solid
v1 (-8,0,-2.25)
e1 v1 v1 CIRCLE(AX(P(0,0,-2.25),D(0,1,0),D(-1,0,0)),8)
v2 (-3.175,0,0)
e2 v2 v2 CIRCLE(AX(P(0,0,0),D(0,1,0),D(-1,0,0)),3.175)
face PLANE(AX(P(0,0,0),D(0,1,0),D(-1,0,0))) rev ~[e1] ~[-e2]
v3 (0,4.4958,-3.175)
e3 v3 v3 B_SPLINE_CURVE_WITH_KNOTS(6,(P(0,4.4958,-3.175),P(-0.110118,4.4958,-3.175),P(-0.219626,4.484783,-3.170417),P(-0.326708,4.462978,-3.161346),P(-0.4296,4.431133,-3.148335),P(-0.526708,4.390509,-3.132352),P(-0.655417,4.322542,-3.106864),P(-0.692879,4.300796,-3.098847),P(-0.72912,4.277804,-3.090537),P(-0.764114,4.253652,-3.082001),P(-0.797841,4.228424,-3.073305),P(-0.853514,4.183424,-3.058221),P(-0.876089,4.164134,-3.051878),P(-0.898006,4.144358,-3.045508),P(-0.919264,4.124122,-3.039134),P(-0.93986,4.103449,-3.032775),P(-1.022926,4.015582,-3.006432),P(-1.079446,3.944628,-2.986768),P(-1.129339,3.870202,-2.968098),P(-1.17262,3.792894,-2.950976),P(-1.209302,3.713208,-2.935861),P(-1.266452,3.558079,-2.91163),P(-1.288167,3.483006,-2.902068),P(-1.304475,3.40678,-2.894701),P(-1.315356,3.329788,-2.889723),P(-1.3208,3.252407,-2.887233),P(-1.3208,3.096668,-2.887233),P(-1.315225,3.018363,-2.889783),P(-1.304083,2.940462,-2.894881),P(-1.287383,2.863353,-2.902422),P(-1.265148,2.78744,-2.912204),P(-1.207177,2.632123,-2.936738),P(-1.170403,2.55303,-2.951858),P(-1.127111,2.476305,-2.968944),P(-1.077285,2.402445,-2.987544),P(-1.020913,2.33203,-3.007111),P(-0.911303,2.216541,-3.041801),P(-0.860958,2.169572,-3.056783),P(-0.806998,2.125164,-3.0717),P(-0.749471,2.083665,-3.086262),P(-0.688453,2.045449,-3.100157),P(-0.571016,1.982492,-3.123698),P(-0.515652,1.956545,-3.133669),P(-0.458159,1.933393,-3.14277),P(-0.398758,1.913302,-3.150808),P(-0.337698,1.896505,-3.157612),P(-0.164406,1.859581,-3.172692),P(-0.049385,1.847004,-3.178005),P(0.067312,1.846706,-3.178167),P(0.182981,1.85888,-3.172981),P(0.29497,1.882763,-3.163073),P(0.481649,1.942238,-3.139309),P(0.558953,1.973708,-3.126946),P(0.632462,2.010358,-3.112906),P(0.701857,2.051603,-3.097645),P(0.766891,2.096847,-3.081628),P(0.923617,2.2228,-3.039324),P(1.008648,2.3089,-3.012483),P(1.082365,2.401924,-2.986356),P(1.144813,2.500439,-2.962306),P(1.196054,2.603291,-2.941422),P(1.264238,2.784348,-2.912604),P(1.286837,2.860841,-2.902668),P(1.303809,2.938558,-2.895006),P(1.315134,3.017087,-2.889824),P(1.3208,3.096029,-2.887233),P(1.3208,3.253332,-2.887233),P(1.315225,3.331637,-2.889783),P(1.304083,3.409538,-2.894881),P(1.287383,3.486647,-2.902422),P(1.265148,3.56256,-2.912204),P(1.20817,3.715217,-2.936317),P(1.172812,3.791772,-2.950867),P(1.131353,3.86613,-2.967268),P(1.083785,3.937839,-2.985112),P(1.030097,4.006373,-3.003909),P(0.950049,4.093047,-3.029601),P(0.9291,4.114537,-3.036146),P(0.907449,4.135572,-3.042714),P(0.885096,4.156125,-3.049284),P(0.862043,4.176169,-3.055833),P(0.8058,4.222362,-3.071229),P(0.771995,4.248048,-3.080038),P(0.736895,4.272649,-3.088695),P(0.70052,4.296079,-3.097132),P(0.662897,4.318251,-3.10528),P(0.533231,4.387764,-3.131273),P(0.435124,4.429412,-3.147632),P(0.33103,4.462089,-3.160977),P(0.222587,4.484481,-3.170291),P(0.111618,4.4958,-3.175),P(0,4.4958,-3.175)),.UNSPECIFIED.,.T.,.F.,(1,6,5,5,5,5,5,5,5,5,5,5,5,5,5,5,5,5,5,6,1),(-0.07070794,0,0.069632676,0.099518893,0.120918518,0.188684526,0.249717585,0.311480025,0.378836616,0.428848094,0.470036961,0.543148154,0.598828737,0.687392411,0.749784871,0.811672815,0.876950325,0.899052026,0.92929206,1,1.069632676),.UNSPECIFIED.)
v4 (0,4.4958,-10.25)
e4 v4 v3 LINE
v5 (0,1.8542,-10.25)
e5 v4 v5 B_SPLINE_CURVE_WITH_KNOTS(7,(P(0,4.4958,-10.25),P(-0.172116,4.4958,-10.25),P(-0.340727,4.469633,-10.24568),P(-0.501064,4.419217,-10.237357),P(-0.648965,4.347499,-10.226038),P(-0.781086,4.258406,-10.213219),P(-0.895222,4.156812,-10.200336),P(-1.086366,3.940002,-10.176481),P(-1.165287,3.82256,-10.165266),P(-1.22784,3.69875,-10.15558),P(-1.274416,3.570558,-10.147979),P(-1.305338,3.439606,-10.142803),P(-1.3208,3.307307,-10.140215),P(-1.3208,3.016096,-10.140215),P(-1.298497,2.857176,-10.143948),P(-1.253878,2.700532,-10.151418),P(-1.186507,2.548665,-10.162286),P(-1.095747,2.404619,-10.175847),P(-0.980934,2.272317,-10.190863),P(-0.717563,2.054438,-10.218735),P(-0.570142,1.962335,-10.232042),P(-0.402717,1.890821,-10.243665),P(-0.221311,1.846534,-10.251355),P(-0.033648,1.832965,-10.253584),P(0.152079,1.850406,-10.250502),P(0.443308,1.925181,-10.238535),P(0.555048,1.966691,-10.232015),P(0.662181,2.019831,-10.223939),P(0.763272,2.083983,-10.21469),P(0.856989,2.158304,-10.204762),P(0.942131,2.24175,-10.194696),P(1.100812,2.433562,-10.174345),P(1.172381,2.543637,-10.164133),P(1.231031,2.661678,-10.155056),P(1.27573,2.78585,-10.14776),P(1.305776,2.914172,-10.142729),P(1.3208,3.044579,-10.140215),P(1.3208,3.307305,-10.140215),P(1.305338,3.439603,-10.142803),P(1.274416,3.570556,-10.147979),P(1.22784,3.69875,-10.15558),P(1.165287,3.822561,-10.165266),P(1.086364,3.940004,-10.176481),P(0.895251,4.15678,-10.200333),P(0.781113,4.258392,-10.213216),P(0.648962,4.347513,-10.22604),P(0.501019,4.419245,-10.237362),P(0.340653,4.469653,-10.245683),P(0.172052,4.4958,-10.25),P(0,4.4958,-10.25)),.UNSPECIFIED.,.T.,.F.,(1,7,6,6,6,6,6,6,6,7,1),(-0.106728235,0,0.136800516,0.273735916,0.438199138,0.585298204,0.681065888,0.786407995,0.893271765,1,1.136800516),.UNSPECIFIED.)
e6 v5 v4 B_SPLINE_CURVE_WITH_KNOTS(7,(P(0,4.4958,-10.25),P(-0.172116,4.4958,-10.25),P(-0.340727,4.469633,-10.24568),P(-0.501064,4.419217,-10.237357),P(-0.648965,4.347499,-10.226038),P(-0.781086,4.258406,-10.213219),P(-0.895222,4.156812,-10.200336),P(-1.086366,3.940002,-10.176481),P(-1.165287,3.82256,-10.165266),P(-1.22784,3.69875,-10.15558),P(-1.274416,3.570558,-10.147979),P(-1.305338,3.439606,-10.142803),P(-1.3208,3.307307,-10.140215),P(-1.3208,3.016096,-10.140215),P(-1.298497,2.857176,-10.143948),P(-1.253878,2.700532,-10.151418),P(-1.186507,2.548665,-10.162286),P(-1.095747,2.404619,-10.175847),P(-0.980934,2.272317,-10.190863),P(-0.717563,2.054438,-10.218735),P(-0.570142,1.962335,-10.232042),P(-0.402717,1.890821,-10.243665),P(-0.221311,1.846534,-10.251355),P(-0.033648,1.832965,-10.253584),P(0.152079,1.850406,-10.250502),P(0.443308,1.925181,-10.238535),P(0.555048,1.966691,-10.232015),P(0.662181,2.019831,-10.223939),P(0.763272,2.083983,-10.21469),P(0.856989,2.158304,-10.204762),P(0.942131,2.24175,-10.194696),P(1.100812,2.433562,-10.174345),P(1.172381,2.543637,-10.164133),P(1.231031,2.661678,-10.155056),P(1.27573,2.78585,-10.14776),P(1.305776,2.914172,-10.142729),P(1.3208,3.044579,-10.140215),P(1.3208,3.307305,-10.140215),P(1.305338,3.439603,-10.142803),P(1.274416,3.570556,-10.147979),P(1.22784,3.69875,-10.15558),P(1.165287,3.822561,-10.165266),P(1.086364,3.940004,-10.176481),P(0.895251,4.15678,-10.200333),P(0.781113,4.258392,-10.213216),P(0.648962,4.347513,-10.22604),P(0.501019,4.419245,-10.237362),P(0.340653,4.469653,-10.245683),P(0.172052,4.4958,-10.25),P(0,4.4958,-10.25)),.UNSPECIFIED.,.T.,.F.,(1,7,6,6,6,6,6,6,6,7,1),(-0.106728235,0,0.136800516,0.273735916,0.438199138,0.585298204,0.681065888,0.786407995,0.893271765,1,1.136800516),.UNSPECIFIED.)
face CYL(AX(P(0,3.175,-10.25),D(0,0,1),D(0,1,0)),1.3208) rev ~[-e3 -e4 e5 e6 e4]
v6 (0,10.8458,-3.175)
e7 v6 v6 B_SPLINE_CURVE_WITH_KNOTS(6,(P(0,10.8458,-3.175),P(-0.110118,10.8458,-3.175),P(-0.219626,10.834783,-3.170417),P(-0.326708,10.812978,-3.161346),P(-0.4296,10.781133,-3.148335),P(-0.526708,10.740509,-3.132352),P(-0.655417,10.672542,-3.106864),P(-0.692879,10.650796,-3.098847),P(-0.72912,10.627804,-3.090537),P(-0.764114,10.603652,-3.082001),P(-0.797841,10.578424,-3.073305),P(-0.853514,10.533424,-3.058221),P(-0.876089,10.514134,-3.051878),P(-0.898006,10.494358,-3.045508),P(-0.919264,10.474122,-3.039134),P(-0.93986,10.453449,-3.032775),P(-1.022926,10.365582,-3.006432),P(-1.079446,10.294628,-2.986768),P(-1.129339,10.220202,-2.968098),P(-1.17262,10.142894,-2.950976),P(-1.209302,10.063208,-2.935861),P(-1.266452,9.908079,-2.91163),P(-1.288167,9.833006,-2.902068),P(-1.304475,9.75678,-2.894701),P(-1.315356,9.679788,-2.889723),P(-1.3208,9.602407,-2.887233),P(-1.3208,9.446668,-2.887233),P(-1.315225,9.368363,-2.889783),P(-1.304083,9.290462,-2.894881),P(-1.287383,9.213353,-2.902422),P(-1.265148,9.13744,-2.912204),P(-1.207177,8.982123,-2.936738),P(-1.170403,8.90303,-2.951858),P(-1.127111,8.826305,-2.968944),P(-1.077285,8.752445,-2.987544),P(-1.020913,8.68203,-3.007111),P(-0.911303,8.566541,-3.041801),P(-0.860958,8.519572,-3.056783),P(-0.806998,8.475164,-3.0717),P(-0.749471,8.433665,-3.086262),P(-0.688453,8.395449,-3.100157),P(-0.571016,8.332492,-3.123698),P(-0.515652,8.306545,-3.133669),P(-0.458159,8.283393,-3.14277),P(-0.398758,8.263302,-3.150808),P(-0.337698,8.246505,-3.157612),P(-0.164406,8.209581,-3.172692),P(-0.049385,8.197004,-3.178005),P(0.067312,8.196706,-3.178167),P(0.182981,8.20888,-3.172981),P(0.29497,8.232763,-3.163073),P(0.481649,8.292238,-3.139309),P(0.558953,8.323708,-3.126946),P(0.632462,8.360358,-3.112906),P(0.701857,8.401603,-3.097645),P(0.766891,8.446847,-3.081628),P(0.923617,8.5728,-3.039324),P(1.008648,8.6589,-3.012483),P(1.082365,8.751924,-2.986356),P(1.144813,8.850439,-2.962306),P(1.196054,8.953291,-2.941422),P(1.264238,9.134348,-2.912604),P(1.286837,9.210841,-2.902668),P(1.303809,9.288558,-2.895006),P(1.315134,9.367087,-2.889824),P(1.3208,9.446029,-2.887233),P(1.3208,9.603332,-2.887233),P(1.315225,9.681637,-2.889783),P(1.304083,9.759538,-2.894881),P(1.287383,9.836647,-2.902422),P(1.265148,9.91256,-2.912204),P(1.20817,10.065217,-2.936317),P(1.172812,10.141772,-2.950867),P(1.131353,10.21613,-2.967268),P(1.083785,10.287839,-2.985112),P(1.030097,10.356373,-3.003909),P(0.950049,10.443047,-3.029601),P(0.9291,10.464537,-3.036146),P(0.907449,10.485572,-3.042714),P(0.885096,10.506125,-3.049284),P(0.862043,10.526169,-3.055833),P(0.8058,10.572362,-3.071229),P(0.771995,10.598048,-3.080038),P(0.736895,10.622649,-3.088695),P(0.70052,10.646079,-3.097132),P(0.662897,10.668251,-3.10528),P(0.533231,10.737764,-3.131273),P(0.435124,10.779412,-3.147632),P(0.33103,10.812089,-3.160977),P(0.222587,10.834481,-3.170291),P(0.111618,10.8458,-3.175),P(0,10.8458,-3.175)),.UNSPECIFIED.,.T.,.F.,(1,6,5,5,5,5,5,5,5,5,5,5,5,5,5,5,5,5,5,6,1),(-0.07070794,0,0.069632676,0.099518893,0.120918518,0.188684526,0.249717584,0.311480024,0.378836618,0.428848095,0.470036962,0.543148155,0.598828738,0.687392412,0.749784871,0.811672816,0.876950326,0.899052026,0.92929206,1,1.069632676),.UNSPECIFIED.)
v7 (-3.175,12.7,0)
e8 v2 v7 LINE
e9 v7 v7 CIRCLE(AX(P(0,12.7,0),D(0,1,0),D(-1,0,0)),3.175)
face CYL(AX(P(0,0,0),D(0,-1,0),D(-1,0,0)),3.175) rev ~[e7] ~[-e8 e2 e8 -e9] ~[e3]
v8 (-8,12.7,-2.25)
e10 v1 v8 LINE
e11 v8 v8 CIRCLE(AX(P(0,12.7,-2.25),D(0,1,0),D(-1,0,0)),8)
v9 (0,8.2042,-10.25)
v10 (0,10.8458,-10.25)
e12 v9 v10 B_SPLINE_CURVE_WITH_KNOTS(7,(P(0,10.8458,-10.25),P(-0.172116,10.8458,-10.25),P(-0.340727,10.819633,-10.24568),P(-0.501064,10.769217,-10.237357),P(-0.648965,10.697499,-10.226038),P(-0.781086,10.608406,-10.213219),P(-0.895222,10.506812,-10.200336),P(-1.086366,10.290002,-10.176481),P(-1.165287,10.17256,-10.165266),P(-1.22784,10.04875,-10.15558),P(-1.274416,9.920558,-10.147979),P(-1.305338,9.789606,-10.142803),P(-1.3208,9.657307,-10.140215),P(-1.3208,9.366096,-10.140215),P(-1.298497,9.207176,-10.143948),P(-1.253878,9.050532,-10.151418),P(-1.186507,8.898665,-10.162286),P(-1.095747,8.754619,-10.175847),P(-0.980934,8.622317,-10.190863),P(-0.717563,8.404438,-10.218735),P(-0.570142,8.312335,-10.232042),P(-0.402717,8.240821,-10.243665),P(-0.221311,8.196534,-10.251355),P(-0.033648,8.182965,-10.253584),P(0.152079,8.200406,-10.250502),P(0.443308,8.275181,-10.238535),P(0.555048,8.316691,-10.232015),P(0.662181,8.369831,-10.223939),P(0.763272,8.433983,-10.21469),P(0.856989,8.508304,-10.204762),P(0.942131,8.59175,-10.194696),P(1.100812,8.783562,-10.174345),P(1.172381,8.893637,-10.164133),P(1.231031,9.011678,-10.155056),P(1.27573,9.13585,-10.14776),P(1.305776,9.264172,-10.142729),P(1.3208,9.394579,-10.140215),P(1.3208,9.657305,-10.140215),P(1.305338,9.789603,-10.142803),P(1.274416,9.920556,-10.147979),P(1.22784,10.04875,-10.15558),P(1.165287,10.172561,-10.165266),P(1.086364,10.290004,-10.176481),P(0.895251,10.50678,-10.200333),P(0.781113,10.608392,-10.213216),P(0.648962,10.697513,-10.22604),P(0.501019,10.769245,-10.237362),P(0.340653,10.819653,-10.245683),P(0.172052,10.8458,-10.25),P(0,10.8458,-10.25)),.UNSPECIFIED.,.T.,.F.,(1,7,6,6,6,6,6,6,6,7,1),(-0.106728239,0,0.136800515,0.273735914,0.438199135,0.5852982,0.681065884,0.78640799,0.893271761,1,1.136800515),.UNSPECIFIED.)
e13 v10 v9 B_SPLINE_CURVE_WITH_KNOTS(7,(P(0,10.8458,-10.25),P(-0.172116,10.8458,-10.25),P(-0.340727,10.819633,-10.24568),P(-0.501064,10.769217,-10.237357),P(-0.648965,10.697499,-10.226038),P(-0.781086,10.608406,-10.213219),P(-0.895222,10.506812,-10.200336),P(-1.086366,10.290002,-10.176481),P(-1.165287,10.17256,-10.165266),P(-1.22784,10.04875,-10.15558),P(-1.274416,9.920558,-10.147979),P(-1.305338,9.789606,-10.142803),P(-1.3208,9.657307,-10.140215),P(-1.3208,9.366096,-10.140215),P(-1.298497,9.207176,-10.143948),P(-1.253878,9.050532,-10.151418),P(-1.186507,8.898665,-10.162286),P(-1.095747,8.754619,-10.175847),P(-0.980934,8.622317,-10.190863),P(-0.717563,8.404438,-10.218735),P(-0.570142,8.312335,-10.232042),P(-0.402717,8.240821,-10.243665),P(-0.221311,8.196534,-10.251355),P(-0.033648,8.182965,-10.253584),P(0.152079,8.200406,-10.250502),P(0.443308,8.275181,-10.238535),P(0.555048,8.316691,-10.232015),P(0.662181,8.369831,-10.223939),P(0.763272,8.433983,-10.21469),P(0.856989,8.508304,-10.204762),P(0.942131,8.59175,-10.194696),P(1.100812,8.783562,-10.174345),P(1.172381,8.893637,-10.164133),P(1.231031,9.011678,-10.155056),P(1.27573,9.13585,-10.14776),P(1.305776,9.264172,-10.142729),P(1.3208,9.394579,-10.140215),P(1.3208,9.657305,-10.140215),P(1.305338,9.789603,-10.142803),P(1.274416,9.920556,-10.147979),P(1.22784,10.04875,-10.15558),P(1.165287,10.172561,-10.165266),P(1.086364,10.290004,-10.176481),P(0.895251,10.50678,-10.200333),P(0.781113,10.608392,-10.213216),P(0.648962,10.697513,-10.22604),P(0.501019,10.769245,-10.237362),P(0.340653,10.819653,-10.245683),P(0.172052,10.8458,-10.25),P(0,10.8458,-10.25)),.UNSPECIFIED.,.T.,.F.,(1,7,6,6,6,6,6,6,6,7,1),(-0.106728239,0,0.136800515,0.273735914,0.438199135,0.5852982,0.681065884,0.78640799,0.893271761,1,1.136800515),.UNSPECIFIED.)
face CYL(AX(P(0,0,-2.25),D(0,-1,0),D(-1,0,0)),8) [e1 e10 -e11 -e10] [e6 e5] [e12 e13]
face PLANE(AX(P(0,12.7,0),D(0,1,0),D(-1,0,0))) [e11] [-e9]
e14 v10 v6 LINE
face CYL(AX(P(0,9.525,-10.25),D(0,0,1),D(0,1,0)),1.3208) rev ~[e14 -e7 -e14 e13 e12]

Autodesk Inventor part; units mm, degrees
ref_plane "YZ Plane" through (0, 0, 0) normal (1, 0, 0) x (0, 1, 0)
ref_plane "XZ Plane" through (0, 0, 0) normal (0, 1, 0) x (-1, 0, 0)
sketch "Sketch1" plane through (0, 0, 0) normal (0, 1, 0) x (-1, 0, 0)
  circle A0 centre (0, 0) radius 3.175
  circle A1 centre (0, -2.25) radius 8
  line L0 (0, -2.25) -> (0, 0) construction
  circle A2 centre (0, 0) radius 4.7625 construction
  dimension "d5" = 6.35
  dimension "d6" = 2.25
  dimension "d9" = 9.525
  dimension "d11" = 16
extrude "Extrusion1" add sketch "Sketch1" along normal blind 12.7
ref_plane "Work Plane1" through (0, 0, -10.25) normal (0, 0, 1) x (1, 0, 0)
sketch "Sketch2" plane through (0, 0, -10.25) normal (0, 0, 1) x (1, 0, 0)
  circle A0 centre (0, 3.175) radius 1.7272
  line L0 (0, -2.54) -> (0, 15.24) construction
  circle A1 centre (0, 9.525) radius 1.7272
  line L1 (8, 0) -> (-8, 0) projected
  line L2 (8, 12.7) -> (-8, 12.7) projected
  point P0 (0, 0)
  dimension "d14" = 3.4544
  dimension "d15" = 3.4544
  dimension "d16" = 3.175
  dimension "d17" = 3.175
hole "Hole1" at (0, 3.175, -10.25) at (0, 9.525, -10.25) direction (0, 0, 1) diameter 2.6416 end up to surface thread size "6-32 UNC" class "2B" standard "ANSI Unified Screw Threads"
equation "\"d15\" = d14"
equation "\"d16\" = 0.25 * d12"
equation "\"d17\" = 0.25 * d12"
equation "\"d12\" = 12.7"
properties part number "Capper Gate Bushing" material "Brass, Soft Yellow"
